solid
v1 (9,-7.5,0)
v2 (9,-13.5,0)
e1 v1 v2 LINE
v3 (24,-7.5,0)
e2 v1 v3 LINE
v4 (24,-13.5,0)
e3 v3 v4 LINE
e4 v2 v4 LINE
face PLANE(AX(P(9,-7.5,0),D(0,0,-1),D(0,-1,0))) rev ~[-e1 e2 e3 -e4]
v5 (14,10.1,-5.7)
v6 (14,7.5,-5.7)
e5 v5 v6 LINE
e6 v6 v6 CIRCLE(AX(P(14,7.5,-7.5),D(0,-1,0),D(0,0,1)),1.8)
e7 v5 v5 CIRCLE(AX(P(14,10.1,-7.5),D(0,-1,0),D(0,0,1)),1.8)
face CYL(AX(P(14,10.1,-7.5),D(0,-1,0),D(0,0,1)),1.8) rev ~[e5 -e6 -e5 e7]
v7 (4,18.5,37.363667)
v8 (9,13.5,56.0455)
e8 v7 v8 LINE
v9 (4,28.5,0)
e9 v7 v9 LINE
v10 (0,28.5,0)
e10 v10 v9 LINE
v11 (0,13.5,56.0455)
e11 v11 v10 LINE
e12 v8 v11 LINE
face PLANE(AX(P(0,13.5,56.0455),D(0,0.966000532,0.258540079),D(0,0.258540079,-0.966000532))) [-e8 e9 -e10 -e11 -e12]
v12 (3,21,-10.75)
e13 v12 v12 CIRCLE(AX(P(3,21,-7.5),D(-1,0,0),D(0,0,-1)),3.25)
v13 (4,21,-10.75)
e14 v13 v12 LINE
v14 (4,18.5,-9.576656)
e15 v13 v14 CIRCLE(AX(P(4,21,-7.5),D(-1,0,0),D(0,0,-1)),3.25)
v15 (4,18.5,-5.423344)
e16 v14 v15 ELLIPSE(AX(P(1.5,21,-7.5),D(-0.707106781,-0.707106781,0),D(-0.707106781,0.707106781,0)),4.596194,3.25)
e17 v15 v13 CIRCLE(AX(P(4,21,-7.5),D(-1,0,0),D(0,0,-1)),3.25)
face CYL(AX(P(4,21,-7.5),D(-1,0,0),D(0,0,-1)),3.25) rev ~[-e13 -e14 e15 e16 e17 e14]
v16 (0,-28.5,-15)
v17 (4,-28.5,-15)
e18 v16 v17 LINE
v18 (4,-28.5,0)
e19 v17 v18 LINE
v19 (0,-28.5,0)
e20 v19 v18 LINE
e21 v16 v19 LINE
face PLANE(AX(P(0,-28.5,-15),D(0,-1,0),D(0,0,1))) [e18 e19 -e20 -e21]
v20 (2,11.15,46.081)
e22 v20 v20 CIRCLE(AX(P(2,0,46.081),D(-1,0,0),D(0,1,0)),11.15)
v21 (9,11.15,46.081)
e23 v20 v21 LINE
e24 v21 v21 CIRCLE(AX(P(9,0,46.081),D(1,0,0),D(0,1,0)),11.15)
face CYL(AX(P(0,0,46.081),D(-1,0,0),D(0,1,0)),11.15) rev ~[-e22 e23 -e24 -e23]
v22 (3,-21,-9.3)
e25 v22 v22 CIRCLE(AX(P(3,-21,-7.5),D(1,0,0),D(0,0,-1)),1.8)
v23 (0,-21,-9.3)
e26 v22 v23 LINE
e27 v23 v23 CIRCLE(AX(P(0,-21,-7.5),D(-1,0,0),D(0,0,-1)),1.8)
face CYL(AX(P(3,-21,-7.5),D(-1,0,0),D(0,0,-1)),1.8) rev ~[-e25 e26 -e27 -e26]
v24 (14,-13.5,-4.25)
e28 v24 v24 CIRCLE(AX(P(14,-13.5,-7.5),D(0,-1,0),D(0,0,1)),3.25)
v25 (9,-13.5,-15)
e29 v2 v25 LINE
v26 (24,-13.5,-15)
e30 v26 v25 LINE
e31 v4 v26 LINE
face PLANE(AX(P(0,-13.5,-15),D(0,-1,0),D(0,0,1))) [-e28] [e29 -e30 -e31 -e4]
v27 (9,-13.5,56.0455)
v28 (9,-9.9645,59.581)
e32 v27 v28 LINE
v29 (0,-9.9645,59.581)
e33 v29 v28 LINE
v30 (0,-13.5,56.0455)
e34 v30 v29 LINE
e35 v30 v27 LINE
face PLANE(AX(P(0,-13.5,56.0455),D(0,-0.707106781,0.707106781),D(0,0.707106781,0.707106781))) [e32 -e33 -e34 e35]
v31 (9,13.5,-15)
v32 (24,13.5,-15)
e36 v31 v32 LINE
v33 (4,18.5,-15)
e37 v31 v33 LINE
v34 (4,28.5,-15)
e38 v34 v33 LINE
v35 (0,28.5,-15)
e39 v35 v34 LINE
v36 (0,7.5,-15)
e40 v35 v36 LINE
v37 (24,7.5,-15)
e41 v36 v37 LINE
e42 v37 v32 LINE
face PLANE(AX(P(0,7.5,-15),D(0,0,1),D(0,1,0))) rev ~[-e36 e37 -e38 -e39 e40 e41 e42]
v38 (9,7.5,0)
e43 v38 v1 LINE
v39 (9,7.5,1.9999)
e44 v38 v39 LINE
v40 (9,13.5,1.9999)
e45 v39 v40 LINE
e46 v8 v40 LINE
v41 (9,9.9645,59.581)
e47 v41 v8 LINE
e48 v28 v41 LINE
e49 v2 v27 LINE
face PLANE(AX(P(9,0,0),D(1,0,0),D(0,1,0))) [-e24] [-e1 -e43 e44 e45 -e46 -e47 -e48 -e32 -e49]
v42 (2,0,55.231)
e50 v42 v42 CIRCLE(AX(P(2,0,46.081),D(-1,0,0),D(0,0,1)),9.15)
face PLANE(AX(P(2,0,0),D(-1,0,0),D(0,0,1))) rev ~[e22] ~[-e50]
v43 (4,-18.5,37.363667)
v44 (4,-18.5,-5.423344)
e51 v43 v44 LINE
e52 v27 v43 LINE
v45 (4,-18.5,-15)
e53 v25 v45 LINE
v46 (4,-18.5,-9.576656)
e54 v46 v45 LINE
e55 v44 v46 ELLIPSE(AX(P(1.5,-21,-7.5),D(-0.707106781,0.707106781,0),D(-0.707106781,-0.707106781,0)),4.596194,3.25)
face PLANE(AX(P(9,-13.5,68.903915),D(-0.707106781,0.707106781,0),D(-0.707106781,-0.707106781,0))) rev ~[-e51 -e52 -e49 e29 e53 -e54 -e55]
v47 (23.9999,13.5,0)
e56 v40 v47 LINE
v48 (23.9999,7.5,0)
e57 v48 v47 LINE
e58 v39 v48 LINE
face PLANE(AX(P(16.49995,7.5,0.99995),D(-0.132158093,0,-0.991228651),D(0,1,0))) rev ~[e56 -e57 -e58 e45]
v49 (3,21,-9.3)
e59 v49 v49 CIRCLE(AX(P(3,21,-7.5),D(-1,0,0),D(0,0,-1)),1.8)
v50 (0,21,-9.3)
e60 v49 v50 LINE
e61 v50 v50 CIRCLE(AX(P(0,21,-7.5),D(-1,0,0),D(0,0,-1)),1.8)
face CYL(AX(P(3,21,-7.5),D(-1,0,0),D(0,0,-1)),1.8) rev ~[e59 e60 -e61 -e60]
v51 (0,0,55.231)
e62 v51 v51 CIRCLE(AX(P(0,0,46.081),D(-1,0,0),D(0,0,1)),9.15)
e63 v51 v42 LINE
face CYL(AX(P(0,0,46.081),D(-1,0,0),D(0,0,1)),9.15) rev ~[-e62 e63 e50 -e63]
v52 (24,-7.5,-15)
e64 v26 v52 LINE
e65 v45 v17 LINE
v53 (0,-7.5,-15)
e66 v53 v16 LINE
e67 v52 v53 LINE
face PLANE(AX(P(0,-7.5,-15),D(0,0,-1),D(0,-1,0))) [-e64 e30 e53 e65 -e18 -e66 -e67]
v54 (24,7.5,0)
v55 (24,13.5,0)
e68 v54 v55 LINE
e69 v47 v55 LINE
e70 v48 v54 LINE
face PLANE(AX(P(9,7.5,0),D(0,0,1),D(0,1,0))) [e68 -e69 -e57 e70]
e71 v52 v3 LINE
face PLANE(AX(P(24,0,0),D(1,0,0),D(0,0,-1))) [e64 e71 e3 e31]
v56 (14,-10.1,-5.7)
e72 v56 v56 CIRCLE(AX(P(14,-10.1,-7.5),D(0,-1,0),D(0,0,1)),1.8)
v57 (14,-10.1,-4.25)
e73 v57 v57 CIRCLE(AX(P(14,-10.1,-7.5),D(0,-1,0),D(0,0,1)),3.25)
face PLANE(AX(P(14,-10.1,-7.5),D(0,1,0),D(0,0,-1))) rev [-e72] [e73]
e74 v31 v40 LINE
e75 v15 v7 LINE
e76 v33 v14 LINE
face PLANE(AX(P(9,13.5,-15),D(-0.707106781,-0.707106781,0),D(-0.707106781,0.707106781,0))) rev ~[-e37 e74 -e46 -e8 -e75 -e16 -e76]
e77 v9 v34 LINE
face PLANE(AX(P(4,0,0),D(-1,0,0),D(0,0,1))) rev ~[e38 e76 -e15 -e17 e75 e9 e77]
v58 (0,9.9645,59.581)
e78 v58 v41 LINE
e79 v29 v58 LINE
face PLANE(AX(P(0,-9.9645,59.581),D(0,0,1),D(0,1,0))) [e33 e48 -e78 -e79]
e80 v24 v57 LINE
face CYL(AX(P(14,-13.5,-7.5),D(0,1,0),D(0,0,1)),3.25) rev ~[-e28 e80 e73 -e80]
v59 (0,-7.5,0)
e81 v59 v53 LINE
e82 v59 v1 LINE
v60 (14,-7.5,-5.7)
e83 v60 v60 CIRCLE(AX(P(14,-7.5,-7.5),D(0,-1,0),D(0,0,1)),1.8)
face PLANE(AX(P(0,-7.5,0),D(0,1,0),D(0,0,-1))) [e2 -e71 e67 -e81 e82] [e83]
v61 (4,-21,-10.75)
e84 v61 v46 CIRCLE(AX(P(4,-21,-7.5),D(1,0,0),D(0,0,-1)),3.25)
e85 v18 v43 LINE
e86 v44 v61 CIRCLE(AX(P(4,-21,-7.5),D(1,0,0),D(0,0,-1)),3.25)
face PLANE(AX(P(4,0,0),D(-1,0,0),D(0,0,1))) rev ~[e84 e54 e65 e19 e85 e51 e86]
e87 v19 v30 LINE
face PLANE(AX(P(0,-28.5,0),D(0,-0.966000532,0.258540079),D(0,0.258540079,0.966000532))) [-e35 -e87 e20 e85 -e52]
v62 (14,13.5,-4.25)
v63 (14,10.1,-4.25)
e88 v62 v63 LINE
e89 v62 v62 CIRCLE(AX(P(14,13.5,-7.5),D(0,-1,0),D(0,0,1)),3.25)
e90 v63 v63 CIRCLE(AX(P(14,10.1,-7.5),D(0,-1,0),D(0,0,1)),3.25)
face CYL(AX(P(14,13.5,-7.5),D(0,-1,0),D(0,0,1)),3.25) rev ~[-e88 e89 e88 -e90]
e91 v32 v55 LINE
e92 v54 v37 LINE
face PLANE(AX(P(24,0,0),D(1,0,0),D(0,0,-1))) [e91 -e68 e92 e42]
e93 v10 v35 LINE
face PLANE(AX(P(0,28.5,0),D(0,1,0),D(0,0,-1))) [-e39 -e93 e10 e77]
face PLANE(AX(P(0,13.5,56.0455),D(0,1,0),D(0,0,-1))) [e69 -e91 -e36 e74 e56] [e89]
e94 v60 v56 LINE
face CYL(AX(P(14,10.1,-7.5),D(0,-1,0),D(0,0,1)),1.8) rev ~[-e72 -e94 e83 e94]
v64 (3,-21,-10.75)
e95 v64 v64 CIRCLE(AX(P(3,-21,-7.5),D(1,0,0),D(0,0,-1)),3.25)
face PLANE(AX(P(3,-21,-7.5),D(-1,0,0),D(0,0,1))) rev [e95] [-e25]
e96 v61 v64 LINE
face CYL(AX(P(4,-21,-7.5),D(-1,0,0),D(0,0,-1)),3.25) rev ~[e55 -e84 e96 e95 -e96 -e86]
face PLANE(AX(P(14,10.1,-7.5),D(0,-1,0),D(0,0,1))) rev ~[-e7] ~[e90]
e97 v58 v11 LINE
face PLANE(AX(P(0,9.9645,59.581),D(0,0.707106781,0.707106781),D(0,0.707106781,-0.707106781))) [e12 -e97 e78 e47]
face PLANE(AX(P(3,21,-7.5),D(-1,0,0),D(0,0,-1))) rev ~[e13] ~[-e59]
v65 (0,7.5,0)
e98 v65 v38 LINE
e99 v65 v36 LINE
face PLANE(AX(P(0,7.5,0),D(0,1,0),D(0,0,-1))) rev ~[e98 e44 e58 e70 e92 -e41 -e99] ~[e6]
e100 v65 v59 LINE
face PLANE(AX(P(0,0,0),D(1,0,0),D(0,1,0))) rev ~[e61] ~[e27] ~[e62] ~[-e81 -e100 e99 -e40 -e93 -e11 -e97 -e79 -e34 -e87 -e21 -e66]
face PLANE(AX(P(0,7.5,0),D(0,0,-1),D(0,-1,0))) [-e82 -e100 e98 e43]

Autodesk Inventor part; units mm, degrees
ref_plane "YZ Plane" through (0, 0, 0) normal (1, 0, 0) x (0, 1, 0)
ref_plane "XZ Plane" through (0, 0, 0) normal (0, 1, 0) x (-1, 0, 0)
ref_plane "XY Plane" through (0, 0, 0) normal (0, 0, 1) x (1, 0, 0)
sketch "Sketch1" plane through (0, 0, 0) normal (1, 0, 0) x (0, 1, 0)
  line L0 (7.5, 0) -> (-7.5, 0)
  line L1 (-7.5, 0) -> (-7.5, -15)
  line L2 (-7.5, -15) -> (-13.5, -15)
  circle A0 centre (0, 46.081) radius 11.15
  line L3 (7.5, 0) -> (7.5, -15)
  line L4 (7.5, -15) -> (13.5, -15)
  line L5 (-13.5, -15) -> (-13.5, 56.0455)
  line L6 (-13.5, 56.0455) -> (-9.9645, 59.581)
  line L7 (-9.9645, 59.581) -> (9.9645, 59.581)
  line L8 (9.9645, 59.581) -> (13.5, 56.0455)
  line L9 (13.5, 56.0455) -> (13.5, -15)
  point P0 (0, 0)
  point P1 (0, 0)
  point P2 (-13.5, 20.5227)
  dimension "d0" = 15
  dimension "d1" = 46.081
  dimension "d2" = 22.3
  dimension "d9" = 45
  dimension "d10" = 13.5
  dimension "d11" = 5
  dimension "d12" = 27
extrude "Extrusion1" add sketch "Sketch1" along normal blind 9
sketch "Sketch2" plane through (0, 0, 0) normal (-1, 0, 0) x (0, 0, 1)
  circle A0 centre (46.081, 0) radius 11.15 projected
  circle A1 centre (46.081, 0) radius 9.15
  point P0 (0, 0)
  dimension "d13" = 2
extrude "Extrusion2" add sketch "Sketch2" against normal blind 2
sketch "Sketch3" plane through (0, 0, 0) normal (-1, 0, 0) x (0, 0, 1)
  circle A0 centre (46.081, 0) radius 9.15 projected
  line L0 (-15, 13.5) -> (56.0455, 13.5) projected
  line L1 (-15, 7.5) -> (-15, 13.5) projected
  line L2 (0, 7.5) -> (-15, 7.5) projected
  line L3 (0, -7.5) -> (0, 7.5) projected
  line L4 (-15, -7.5) -> (0, -7.5) projected
  line L5 (-15, -13.5) -> (-15, -7.5) projected
  line L6 (56.0455, -13.5) -> (-15, -13.5) projected
  line L7 (59.581, -9.9645) -> (56.0455, -13.5) projected
  line L8 (59.581, 9.9645) -> (59.581, -9.9645) projected
  line L9 (56.0455, 13.5) -> (59.581, 9.9645) projected
  line L10 (-15, -13.5) -> (-15, -7.5) projected
  line L11 (-15, -13.5) -> (-15, -28.5)
  line L12 (-15, -28.5) -> (0, -28.5)
  line L13 (56.0455, -13.5) -> (-15, -13.5) projected
  line L14 (0, -28.5) -> (56.0455, -13.5)
  line L15 (-15, 13.5) -> (56.0455, 13.5) projected
  line L16 (56.0455, 13.5) -> (0, 28.5)
  line L17 (0, 28.5) -> (-15, 28.5)
  line L18 (-15, 28.5) -> (-15, 13.5)
  point P0 (0, 0)
  dimension "d16" = 15
  dimension "d17" = 15
extrude "Extrusion3" add sketch "Sketch3" against normal blind 4 contours L18 L17 L16 L0 | L14 L12 L11 L6
sketch "Sketch4" plane through (9, 0, 0) normal (1, 0, 0) x (0, 0, -1)
  line L0 (15, 13.5) -> (-56.0455, 13.5) projected
  line L1 (15, 7.5) -> (15, 13.5) projected
  line L2 (0, 7.5) -> (15, 7.5) projected
  line L3 (0, -7.5) -> (0, 7.5) projected
  line L4 (15, -7.5) -> (0, -7.5) projected
  line L5 (15, -13.5) -> (15, -7.5) projected
  line L6 (-56.0455, -13.5) -> (15, -13.5) projected
  line L7 (0, -7.5) -> (0, -13.5)
  line L8 (0, 7.5) -> (15, 7.5) projected
  line L9 (0, 7.5) -> (0, 13.5)
  point P0 (0, 0)
extrude "Extrusion4" add sketch "Sketch4" along normal blind 15
chamfer "Chamfer2" distance 2 distance2 15 1 edges at (9, 10.5, 0) measured on face at (9, 0.448, 11.6708)
sketch "Sketch5" plane through (24, 13.5, 0) normal (0, 1, 0) x (1, 0, 0)
  line L0 (0, 0) -> (-15, -2) projected
  line L1 (0, 15) -> (0, 0) projected
  line L2 (-20, 15) -> (0, 15) projected
  line L3 (-20, 15) -> (-20, -56.0455) projected
  line L4 (-20, -56.0455) -> (-15, -56.0455) projected
  line L5 (-15, -2) -> (-15, -56.0455) projected
  point P0 (-24, 0)
  point P1 (-10, 7.5)
  point P2 (-10, 15)
  point P3 (0, 7.5)
hole "Hole1" at (14, 13.5, -7.5) direction (0, -1, 0) diameter 3.6 end through all counterbore diameter 6.5 counterbore depth 3.4 clearance for "Socket Head Cap Screw DIN EN ISO 4762" size "M3" standard "DIN"
sketch "Sketch7" plane through (4, 0, 0) normal (1, 0, 0) x (0, 0, -1)
  line L0 (15, 28.5) -> (0, 28.5) projected
  line L1 (0, 28.5) -> (-56.0455, 13.5) projected
  line L2 (15, 13.5) -> (-56.0455, 13.5) projected
  line L3 (15, 13.5) -> (15, 28.5) projected
  point P0 (0, 0)
  point P1 (7.5, 21)
  point P2 (7.5, 28.5)
  point P3 (15, 21)
hole "Hole3" at (4, 21, -7.5) direction (-1, 0, 0) diameter 3.6 end through all counterbore diameter 6.5 counterbore depth 1 clearance for "Socket Head Cap Screw DIN EN ISO 4762" size "M3" standard "DIN"
mirror "Mirror1" about plane through (0, 0, 0) normal (0, 1, 0) of "Hole3", "Hole1"
chamfer "Chamfer6" distance 5 angle 45 2 edges at (4, 13.5, 20.5227) (4, -13.5, 20.5227)
properties part number "Rear Z Axis Top Bearing" material "ABS Plastic"
